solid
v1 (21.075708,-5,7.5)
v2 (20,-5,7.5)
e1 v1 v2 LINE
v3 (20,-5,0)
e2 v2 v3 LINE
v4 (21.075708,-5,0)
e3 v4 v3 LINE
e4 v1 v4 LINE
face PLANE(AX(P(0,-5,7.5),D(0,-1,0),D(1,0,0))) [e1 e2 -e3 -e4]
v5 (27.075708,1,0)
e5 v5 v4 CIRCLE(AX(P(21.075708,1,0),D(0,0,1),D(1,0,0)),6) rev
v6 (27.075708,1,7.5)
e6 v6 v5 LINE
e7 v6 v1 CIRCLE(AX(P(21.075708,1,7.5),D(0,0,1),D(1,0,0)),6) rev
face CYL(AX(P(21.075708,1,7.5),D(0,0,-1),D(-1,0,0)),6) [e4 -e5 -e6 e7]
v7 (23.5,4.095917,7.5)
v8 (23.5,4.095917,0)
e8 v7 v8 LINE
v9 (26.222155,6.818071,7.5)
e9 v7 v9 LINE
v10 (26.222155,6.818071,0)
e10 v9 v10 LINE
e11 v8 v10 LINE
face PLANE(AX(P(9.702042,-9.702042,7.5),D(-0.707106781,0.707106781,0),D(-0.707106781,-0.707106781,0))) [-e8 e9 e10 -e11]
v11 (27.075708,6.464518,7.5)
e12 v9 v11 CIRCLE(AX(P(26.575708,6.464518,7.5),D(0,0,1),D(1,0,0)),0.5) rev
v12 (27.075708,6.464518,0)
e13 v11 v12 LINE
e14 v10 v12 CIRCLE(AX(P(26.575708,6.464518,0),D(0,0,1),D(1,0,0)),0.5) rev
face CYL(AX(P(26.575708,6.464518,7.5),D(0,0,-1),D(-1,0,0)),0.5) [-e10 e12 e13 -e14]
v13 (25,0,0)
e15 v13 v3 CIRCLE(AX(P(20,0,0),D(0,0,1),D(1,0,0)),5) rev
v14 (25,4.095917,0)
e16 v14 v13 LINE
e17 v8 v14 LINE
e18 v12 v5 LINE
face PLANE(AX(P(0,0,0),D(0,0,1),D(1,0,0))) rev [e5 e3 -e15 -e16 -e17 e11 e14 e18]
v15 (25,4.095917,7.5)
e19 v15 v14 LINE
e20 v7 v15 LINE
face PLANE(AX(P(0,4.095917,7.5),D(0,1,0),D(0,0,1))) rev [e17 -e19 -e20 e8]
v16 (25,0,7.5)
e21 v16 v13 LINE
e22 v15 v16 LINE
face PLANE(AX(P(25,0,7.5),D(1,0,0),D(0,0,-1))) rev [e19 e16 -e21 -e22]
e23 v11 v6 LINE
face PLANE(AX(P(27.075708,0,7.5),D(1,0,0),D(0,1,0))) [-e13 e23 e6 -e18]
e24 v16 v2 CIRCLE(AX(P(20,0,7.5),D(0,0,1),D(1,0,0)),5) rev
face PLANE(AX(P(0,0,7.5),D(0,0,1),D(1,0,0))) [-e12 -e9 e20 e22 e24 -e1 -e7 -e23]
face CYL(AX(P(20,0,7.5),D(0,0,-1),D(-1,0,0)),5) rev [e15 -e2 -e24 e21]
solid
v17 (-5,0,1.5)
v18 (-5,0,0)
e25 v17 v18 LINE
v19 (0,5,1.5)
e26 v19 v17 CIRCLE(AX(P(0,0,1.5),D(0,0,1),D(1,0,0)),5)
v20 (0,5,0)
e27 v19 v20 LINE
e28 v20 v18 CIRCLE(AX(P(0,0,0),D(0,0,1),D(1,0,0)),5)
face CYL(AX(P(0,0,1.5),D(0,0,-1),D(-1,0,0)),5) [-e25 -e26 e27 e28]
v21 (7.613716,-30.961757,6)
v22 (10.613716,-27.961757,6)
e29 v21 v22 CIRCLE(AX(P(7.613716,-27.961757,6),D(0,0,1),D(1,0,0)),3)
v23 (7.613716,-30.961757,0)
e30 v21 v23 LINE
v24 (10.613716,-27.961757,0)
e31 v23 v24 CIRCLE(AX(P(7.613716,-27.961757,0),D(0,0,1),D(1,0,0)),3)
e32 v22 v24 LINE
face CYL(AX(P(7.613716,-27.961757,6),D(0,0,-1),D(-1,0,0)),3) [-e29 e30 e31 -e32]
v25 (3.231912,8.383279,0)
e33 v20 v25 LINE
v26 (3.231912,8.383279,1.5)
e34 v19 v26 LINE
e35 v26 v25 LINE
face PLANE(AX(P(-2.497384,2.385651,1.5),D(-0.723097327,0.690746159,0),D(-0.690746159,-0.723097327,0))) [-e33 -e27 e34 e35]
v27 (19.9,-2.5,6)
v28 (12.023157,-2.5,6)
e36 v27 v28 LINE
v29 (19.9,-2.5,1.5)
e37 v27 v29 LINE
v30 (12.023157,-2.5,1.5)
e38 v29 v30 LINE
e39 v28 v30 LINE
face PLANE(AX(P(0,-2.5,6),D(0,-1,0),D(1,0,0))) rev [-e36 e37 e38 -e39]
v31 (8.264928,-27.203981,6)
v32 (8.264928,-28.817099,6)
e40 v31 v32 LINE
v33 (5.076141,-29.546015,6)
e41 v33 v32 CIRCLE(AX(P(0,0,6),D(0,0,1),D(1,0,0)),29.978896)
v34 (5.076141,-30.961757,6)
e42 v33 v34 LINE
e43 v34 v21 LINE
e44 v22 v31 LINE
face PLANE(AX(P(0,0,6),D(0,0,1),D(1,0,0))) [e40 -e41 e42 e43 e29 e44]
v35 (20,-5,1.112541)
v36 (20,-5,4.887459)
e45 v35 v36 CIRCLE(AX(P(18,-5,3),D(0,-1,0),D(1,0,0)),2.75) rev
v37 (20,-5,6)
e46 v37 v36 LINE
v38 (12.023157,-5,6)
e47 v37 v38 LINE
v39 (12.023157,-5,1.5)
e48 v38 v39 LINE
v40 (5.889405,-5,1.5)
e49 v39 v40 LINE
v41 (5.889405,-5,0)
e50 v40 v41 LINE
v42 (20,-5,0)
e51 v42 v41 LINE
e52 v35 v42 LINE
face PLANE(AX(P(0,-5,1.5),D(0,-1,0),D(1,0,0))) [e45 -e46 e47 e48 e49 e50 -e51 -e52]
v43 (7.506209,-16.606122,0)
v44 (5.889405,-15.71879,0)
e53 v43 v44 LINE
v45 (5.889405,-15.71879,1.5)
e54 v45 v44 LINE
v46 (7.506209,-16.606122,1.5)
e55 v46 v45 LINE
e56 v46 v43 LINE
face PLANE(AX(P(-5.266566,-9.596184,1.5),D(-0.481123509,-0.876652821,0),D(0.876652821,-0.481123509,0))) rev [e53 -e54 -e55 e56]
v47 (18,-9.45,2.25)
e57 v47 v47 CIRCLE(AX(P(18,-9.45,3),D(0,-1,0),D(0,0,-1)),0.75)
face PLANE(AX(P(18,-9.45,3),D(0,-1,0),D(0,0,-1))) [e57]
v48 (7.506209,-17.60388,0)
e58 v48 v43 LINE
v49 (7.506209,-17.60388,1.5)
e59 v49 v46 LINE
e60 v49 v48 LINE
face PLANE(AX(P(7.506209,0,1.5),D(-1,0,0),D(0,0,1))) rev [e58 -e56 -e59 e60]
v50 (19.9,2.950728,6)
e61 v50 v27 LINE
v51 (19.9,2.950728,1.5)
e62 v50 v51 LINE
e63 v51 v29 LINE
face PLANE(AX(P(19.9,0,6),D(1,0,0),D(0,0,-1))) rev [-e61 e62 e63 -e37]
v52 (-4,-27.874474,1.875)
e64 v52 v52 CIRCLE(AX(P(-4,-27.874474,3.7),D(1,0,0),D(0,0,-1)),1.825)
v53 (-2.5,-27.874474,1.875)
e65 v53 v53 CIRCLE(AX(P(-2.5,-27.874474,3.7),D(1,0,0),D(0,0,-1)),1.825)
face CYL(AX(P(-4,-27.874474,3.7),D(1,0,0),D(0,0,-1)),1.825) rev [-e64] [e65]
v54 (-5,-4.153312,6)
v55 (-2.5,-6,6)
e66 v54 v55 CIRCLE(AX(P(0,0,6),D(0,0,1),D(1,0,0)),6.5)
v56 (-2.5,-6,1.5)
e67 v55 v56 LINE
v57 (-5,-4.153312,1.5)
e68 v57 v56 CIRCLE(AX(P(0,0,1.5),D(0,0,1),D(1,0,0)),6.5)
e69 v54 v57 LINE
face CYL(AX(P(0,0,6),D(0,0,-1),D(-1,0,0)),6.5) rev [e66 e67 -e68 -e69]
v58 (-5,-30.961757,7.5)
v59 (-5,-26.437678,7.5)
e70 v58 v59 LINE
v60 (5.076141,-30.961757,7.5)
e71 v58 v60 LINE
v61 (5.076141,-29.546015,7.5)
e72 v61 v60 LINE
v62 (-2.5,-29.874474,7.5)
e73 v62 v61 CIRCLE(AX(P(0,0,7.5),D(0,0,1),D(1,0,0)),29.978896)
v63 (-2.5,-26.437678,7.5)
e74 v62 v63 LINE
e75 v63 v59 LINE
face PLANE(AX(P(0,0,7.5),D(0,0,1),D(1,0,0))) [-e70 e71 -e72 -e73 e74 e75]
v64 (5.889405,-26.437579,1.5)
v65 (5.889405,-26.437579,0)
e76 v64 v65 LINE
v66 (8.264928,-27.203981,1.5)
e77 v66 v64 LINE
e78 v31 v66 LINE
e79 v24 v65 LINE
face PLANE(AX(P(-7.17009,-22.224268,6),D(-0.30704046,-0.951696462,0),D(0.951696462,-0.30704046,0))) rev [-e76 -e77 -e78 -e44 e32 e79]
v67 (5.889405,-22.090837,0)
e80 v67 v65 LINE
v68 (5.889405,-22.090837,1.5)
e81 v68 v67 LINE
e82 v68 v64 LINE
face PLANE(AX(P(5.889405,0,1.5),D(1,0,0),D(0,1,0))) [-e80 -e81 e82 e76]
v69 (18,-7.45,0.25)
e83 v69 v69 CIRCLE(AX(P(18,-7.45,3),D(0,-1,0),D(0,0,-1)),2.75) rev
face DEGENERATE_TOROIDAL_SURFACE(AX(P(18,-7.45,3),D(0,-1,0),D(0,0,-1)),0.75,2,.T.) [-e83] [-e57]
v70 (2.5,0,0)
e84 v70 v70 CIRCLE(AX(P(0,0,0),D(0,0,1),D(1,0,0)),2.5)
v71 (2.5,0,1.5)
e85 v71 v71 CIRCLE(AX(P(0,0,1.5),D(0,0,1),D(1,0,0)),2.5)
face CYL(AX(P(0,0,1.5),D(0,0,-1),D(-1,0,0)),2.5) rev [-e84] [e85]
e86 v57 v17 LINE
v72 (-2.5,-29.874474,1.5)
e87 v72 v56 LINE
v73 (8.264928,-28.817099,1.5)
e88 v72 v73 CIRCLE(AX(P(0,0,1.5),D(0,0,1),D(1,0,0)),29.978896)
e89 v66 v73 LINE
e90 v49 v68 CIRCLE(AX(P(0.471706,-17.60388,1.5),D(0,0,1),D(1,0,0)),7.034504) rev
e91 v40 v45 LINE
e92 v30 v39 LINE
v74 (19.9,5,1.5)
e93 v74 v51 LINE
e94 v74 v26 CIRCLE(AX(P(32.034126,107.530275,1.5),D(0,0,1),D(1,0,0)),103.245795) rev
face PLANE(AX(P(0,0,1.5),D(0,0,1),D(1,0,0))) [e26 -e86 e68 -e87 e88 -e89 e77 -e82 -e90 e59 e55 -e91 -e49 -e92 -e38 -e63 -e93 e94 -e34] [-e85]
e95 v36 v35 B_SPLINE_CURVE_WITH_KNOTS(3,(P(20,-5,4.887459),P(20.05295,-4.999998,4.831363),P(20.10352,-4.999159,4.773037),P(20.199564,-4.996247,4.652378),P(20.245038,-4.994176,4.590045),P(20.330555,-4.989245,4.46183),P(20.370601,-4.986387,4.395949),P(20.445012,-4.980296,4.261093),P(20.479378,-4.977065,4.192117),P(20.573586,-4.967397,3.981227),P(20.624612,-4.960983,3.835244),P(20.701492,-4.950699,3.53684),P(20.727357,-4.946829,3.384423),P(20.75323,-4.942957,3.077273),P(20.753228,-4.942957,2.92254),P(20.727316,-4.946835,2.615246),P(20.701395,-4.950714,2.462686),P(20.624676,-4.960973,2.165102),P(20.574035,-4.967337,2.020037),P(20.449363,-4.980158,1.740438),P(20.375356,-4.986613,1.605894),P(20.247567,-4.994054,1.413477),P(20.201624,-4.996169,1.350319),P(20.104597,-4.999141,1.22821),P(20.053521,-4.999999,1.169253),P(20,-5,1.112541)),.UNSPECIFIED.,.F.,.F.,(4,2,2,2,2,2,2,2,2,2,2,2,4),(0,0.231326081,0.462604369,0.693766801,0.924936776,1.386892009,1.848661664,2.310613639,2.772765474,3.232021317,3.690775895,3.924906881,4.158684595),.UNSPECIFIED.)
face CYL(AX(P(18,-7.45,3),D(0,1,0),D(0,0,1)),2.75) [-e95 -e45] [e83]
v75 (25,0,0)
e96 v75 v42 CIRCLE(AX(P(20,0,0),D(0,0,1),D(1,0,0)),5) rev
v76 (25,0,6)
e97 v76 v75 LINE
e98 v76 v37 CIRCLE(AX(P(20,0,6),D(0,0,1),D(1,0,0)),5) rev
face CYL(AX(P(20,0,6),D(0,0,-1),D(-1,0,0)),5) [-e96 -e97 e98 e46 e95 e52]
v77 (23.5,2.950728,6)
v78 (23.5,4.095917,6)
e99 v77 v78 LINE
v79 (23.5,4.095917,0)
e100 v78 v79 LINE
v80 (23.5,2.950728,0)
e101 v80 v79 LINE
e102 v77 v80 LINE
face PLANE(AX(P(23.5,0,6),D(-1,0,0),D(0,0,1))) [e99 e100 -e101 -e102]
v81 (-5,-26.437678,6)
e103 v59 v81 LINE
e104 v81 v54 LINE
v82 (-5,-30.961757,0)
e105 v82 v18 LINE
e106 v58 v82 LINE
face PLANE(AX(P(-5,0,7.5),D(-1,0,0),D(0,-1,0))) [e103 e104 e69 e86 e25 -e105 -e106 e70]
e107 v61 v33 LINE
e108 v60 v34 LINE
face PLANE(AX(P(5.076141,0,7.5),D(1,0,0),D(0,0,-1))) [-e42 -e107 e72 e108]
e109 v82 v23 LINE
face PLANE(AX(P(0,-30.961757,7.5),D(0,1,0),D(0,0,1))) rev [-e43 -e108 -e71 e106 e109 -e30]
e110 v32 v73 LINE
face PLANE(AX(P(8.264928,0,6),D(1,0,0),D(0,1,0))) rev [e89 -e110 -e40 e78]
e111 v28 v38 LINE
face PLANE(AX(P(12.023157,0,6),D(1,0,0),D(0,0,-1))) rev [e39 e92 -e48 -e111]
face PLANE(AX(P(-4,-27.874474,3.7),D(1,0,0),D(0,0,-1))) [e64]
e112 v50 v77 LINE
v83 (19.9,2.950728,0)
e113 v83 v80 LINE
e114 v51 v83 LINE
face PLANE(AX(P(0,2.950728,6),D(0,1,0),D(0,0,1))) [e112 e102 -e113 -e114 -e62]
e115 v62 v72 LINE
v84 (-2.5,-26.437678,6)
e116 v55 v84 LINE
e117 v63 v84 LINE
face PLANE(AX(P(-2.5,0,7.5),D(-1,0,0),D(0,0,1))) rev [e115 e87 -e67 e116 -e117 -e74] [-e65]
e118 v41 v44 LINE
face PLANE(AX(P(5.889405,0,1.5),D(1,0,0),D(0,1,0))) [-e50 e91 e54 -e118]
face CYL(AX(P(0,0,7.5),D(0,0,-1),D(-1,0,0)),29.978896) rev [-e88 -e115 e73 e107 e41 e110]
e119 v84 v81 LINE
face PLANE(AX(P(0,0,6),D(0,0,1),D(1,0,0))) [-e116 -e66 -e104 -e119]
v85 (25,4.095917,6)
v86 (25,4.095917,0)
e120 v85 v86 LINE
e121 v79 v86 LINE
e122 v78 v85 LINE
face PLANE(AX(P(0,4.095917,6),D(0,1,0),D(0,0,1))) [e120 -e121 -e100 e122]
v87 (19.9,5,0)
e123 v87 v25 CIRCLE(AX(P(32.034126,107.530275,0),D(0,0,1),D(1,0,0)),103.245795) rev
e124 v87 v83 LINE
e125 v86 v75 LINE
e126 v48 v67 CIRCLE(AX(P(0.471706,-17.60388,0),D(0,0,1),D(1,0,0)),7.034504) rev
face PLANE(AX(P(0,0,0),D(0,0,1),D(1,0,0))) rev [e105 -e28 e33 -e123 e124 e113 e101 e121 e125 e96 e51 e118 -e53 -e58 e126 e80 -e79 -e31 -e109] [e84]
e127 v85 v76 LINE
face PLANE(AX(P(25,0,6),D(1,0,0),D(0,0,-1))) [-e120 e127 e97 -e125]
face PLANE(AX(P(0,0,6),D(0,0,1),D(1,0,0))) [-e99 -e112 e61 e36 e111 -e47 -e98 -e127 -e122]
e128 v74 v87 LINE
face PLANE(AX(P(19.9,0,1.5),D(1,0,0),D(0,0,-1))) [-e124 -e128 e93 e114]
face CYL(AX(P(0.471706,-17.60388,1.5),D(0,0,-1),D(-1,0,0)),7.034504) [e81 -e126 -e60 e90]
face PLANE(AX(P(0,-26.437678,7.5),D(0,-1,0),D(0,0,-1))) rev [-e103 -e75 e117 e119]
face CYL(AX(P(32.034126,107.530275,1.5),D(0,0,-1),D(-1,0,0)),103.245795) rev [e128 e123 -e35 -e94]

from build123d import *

# Parameters (mm, degrees)
EXTRUDE_3_DEPTH     = 7.5
EXTRUDE_3_2_DEPTH   = 7.5
EXTRUDE_4_DEPTH     = 6
SKETCH_1_8_R        = 2.5
EXTRUDE_5_DEPTH     = 1.5
SKETCH_2_R          = 2.75
EXTRUDE_6_DEPTH     = 2.45
SKETCH_4_R          = 2.75
EXTRUDE_7_DEPTH     = 2
SKETCH_5_R          = 1.825
CUT_EXTRUDE_1_DEPTH = 1.5


with BuildPart() as part:
    # 스케치1 → 보스-돌출3 (new body)
    with BuildSketch(Plane.XY):
        with BuildLine():
            Line((-2.5, -26.437677825), (-5, -26.437677825))
            Line((-5, -26.437677825), (-5, -30.96175738))
            Line((-5, -30.96175738), (5.076141326, -30.96175738))
            Line((5.076141326, -30.96175738), (5.076141326, -29.54601506))
            ThreePointArc((5.076141326, -29.54601506), (1.298498135, -29.950761581), (-2.5, -29.874474333))
            Line((-2.5, -29.874474333), (-2.5, -26.437677825))
        make_face()
    extrude(amount=EXTRUDE_3_DEPTH)

    # 스케치1<7> → 보스-돌출4 (add)
    with BuildSketch(Plane.XY):
        with BuildLine():
            Line((23.5, 2.950728465), (19.9, 2.950728465))
            Line((19.9, 2.950728465), (19.9, -2.5))
            Line((19.9, -2.5), (12.023157318, -2.5))
            Line((12.023157318, -2.5), (12.023157318, -5))
            Line((12.023157318, -5), (20, -5))
            ThreePointArc((20, -5), (23.535533906, -3.535533906), (25, 0))
            Line((25, 0), (25, 4.09591659))
            Line((25, 4.09591659), (23.5, 4.09591659))
            Line((23.5, 4.09591659), (23.5, 2.950728465))
        make_face()
        with BuildLine():
            ThreePointArc((-2.5, -6), (-3.862002616, -5.228282299), (-5, -4.153311931))
            Line((-5, -4.153311931), (-5, -26.437677825))
            Line((-5, -26.437677825), (-2.5, -26.437677825))
            Line((-2.5, -26.437677825), (-2.5, -6))
        make_face()
        with BuildLine():
            Line((5.076141326, -29.54601506), (5.076141326, -30.96175738))
            Line((5.076141326, -30.96175738), (7.613716386, -30.96175738))
            ThreePointArc((7.613716386, -30.96175738), (9.735036729, -30.083077723), (10.613716386, -27.96175738))
            Line((10.613716386, -27.96175738), (8.264928228, -27.20398111))
            Line((8.264928228, -27.20398111), (8.264928228, -28.81709871))
            ThreePointArc((8.264928228, -28.81709871), (6.680483813, -29.225080884), (5.076141326, -29.54601506))
        make_face()
    extrude(amount=EXTRUDE_4_DEPTH)


with BuildPart() as body_2:
    # 스케치1 → Extrude 3 2 (new body)
    with BuildSketch(Plane.XY):
        with BuildLine():
            ThreePointArc((26.22215467, 6.81807126), (26.767049777, 6.926457636), (27.075708061, 6.46451787))
            Line((27.075708061, 6.46451787), (27.075708061, 1))
            ThreePointArc((27.075708061, 1), (25.318348748, -3.242640687), (21.075708061, -5))
            Line((21.075708061, -5), (20, -5))
            ThreePointArc((20, -5), (23.535533906, -3.535533906), (25, 0))
            Line((25, 0), (25, 4.09591659))
            Line((25, 4.09591659), (23.5, 4.09591659))
            Line((23.5, 4.09591659), (26.22215467, 6.81807126))
        make_face()
    extrude(amount=EXTRUDE_3_2_DEPTH)


with BuildPart() as extrude_4_piece_1:
    # of the separate pieces the step leaves, piece 1, a body of its own (extrude_4_pieces)
    add(part.part.solids().sort_by_distance((-2.5, -29.874474333, 0))[0])



with BuildPart() as extrude_4_piece_2:
    # of the separate pieces the step leaves, piece 2, a body of its own (extrude_4_pieces)
    add(part.part.solids().sort_by_distance((23.5, 2.950728465, 0))[0])


with BuildPart() as extrude_4_piece_1_1:
    add(extrude_4_piece_1.part)

    add(extrude_4_piece_2.part)  # 보스-돌출5 merges 보스-돌출4 piece 2
    # 스케치1<8> → 보스-돌출5 (add)
    with BuildSketch(Plane.XY):
        with BuildLine():
            Line((3.231912185, 8.38327913), (0, 5))
            ThreePointArc((0, 5), (-3.535533906, 3.535533906), (-5, 0))
            Line((-5, 0), (-5, -4.153311931))
            ThreePointArc((-5, -4.153311931), (-3.862002616, -5.228282299), (-2.5, -6))
            Line((-2.5, -6), (-2.5, -29.874474333))
            ThreePointArc((-2.5, -29.874474333), (2.93054776, -29.83531643), (8.264928228, -28.81709871))
            Line((8.264928228, -28.81709871), (8.264928228, -27.20398111))
            Line((8.264928228, -27.20398111), (5.889404941, -26.437579436))
            Line((5.889404941, -26.437579436), (5.889404941, -22.090836604))
            ThreePointArc((5.889404941, -22.090836604), (7.089676261, -19.98856225), (7.506209453, -17.603880133))
            Line((7.506209453, -17.603880133), (7.506209453, -16.606122356))
            Line((7.506209453, -16.606122356), (5.889404941, -15.718789718))
            Line((5.889404941, -15.718789718), (5.889404941, -5))
            Line((5.889404941, -5), (12.023157318, -5))
            Line((12.023157318, -5), (12.023157318, -2.5))
            Line((12.023157318, -2.5), (19.9, -2.5))
            Line((19.9, -2.5), (19.9, 5))
            ThreePointArc((19.9, 5), (11.496170313, 6.34783243), (3.231912185, 8.38327913))
        make_face()
        Circle(SKETCH_1_8_R, mode=Mode.SUBTRACT)
    extrude(amount=EXTRUDE_5_DEPTH)

    # 스케치2 → 보스-돌출6 (add, symmetric)
    with BuildSketch(Plane.XZ.offset(5)):
        with Locations(Location((18, 3, 0), (0, 0, 43.341758227))):
            Circle(SKETCH_2_R)
    extrude(amount=EXTRUDE_6_DEPTH, both=True)

    # 스케치4 → 보스-돌출7 (add)
    with BuildSketch(Plane.XZ.offset(7.45)):
        with Locations(Location((18, 3, 0), (0, 0, 43.341758227))):
            Circle(SKETCH_4_R)
    extrude(amount=EXTRUDE_7_DEPTH)

    # 스케치5 → 컷-돌출1 (cut)
    with BuildSketch(Plane(origin=(-2.5, 0, 0), x_dir=(0, 0, -1), z_dir=(1, 0, 0))):
        with Locations((-3.7, -27.874474333)):
            Circle(SKETCH_5_R)
    extrude(amount=-CUT_EXTRUDE_1_DEPTH, mode=Mode.SUBTRACT)

    # 필렛1: read off the stored shape, not the designer's step
    # 필렛1 outline → 필렛1 (revolve, cut)
    with BuildSketch(Plane(origin=(18, 0, 3), x_dir=(1, 0, 0), z_dir=(0, 0, 1))):
        with BuildLine():
            Line((2.75, -9.45), (2.75, -7.45))
            ThreePointArc((2.75, -7.45), (2.164213562, -8.864213562), (0.75, -9.45))
            Line((0.75, -9.45), (2.75, -9.45))
        make_face()
    revolve(axis=Axis((18, 0, 3), (0, 1, 0)), mode=Mode.SUBTRACT)


solid = Compound([body_2.part, extrude_4_piece_1_1.part])
